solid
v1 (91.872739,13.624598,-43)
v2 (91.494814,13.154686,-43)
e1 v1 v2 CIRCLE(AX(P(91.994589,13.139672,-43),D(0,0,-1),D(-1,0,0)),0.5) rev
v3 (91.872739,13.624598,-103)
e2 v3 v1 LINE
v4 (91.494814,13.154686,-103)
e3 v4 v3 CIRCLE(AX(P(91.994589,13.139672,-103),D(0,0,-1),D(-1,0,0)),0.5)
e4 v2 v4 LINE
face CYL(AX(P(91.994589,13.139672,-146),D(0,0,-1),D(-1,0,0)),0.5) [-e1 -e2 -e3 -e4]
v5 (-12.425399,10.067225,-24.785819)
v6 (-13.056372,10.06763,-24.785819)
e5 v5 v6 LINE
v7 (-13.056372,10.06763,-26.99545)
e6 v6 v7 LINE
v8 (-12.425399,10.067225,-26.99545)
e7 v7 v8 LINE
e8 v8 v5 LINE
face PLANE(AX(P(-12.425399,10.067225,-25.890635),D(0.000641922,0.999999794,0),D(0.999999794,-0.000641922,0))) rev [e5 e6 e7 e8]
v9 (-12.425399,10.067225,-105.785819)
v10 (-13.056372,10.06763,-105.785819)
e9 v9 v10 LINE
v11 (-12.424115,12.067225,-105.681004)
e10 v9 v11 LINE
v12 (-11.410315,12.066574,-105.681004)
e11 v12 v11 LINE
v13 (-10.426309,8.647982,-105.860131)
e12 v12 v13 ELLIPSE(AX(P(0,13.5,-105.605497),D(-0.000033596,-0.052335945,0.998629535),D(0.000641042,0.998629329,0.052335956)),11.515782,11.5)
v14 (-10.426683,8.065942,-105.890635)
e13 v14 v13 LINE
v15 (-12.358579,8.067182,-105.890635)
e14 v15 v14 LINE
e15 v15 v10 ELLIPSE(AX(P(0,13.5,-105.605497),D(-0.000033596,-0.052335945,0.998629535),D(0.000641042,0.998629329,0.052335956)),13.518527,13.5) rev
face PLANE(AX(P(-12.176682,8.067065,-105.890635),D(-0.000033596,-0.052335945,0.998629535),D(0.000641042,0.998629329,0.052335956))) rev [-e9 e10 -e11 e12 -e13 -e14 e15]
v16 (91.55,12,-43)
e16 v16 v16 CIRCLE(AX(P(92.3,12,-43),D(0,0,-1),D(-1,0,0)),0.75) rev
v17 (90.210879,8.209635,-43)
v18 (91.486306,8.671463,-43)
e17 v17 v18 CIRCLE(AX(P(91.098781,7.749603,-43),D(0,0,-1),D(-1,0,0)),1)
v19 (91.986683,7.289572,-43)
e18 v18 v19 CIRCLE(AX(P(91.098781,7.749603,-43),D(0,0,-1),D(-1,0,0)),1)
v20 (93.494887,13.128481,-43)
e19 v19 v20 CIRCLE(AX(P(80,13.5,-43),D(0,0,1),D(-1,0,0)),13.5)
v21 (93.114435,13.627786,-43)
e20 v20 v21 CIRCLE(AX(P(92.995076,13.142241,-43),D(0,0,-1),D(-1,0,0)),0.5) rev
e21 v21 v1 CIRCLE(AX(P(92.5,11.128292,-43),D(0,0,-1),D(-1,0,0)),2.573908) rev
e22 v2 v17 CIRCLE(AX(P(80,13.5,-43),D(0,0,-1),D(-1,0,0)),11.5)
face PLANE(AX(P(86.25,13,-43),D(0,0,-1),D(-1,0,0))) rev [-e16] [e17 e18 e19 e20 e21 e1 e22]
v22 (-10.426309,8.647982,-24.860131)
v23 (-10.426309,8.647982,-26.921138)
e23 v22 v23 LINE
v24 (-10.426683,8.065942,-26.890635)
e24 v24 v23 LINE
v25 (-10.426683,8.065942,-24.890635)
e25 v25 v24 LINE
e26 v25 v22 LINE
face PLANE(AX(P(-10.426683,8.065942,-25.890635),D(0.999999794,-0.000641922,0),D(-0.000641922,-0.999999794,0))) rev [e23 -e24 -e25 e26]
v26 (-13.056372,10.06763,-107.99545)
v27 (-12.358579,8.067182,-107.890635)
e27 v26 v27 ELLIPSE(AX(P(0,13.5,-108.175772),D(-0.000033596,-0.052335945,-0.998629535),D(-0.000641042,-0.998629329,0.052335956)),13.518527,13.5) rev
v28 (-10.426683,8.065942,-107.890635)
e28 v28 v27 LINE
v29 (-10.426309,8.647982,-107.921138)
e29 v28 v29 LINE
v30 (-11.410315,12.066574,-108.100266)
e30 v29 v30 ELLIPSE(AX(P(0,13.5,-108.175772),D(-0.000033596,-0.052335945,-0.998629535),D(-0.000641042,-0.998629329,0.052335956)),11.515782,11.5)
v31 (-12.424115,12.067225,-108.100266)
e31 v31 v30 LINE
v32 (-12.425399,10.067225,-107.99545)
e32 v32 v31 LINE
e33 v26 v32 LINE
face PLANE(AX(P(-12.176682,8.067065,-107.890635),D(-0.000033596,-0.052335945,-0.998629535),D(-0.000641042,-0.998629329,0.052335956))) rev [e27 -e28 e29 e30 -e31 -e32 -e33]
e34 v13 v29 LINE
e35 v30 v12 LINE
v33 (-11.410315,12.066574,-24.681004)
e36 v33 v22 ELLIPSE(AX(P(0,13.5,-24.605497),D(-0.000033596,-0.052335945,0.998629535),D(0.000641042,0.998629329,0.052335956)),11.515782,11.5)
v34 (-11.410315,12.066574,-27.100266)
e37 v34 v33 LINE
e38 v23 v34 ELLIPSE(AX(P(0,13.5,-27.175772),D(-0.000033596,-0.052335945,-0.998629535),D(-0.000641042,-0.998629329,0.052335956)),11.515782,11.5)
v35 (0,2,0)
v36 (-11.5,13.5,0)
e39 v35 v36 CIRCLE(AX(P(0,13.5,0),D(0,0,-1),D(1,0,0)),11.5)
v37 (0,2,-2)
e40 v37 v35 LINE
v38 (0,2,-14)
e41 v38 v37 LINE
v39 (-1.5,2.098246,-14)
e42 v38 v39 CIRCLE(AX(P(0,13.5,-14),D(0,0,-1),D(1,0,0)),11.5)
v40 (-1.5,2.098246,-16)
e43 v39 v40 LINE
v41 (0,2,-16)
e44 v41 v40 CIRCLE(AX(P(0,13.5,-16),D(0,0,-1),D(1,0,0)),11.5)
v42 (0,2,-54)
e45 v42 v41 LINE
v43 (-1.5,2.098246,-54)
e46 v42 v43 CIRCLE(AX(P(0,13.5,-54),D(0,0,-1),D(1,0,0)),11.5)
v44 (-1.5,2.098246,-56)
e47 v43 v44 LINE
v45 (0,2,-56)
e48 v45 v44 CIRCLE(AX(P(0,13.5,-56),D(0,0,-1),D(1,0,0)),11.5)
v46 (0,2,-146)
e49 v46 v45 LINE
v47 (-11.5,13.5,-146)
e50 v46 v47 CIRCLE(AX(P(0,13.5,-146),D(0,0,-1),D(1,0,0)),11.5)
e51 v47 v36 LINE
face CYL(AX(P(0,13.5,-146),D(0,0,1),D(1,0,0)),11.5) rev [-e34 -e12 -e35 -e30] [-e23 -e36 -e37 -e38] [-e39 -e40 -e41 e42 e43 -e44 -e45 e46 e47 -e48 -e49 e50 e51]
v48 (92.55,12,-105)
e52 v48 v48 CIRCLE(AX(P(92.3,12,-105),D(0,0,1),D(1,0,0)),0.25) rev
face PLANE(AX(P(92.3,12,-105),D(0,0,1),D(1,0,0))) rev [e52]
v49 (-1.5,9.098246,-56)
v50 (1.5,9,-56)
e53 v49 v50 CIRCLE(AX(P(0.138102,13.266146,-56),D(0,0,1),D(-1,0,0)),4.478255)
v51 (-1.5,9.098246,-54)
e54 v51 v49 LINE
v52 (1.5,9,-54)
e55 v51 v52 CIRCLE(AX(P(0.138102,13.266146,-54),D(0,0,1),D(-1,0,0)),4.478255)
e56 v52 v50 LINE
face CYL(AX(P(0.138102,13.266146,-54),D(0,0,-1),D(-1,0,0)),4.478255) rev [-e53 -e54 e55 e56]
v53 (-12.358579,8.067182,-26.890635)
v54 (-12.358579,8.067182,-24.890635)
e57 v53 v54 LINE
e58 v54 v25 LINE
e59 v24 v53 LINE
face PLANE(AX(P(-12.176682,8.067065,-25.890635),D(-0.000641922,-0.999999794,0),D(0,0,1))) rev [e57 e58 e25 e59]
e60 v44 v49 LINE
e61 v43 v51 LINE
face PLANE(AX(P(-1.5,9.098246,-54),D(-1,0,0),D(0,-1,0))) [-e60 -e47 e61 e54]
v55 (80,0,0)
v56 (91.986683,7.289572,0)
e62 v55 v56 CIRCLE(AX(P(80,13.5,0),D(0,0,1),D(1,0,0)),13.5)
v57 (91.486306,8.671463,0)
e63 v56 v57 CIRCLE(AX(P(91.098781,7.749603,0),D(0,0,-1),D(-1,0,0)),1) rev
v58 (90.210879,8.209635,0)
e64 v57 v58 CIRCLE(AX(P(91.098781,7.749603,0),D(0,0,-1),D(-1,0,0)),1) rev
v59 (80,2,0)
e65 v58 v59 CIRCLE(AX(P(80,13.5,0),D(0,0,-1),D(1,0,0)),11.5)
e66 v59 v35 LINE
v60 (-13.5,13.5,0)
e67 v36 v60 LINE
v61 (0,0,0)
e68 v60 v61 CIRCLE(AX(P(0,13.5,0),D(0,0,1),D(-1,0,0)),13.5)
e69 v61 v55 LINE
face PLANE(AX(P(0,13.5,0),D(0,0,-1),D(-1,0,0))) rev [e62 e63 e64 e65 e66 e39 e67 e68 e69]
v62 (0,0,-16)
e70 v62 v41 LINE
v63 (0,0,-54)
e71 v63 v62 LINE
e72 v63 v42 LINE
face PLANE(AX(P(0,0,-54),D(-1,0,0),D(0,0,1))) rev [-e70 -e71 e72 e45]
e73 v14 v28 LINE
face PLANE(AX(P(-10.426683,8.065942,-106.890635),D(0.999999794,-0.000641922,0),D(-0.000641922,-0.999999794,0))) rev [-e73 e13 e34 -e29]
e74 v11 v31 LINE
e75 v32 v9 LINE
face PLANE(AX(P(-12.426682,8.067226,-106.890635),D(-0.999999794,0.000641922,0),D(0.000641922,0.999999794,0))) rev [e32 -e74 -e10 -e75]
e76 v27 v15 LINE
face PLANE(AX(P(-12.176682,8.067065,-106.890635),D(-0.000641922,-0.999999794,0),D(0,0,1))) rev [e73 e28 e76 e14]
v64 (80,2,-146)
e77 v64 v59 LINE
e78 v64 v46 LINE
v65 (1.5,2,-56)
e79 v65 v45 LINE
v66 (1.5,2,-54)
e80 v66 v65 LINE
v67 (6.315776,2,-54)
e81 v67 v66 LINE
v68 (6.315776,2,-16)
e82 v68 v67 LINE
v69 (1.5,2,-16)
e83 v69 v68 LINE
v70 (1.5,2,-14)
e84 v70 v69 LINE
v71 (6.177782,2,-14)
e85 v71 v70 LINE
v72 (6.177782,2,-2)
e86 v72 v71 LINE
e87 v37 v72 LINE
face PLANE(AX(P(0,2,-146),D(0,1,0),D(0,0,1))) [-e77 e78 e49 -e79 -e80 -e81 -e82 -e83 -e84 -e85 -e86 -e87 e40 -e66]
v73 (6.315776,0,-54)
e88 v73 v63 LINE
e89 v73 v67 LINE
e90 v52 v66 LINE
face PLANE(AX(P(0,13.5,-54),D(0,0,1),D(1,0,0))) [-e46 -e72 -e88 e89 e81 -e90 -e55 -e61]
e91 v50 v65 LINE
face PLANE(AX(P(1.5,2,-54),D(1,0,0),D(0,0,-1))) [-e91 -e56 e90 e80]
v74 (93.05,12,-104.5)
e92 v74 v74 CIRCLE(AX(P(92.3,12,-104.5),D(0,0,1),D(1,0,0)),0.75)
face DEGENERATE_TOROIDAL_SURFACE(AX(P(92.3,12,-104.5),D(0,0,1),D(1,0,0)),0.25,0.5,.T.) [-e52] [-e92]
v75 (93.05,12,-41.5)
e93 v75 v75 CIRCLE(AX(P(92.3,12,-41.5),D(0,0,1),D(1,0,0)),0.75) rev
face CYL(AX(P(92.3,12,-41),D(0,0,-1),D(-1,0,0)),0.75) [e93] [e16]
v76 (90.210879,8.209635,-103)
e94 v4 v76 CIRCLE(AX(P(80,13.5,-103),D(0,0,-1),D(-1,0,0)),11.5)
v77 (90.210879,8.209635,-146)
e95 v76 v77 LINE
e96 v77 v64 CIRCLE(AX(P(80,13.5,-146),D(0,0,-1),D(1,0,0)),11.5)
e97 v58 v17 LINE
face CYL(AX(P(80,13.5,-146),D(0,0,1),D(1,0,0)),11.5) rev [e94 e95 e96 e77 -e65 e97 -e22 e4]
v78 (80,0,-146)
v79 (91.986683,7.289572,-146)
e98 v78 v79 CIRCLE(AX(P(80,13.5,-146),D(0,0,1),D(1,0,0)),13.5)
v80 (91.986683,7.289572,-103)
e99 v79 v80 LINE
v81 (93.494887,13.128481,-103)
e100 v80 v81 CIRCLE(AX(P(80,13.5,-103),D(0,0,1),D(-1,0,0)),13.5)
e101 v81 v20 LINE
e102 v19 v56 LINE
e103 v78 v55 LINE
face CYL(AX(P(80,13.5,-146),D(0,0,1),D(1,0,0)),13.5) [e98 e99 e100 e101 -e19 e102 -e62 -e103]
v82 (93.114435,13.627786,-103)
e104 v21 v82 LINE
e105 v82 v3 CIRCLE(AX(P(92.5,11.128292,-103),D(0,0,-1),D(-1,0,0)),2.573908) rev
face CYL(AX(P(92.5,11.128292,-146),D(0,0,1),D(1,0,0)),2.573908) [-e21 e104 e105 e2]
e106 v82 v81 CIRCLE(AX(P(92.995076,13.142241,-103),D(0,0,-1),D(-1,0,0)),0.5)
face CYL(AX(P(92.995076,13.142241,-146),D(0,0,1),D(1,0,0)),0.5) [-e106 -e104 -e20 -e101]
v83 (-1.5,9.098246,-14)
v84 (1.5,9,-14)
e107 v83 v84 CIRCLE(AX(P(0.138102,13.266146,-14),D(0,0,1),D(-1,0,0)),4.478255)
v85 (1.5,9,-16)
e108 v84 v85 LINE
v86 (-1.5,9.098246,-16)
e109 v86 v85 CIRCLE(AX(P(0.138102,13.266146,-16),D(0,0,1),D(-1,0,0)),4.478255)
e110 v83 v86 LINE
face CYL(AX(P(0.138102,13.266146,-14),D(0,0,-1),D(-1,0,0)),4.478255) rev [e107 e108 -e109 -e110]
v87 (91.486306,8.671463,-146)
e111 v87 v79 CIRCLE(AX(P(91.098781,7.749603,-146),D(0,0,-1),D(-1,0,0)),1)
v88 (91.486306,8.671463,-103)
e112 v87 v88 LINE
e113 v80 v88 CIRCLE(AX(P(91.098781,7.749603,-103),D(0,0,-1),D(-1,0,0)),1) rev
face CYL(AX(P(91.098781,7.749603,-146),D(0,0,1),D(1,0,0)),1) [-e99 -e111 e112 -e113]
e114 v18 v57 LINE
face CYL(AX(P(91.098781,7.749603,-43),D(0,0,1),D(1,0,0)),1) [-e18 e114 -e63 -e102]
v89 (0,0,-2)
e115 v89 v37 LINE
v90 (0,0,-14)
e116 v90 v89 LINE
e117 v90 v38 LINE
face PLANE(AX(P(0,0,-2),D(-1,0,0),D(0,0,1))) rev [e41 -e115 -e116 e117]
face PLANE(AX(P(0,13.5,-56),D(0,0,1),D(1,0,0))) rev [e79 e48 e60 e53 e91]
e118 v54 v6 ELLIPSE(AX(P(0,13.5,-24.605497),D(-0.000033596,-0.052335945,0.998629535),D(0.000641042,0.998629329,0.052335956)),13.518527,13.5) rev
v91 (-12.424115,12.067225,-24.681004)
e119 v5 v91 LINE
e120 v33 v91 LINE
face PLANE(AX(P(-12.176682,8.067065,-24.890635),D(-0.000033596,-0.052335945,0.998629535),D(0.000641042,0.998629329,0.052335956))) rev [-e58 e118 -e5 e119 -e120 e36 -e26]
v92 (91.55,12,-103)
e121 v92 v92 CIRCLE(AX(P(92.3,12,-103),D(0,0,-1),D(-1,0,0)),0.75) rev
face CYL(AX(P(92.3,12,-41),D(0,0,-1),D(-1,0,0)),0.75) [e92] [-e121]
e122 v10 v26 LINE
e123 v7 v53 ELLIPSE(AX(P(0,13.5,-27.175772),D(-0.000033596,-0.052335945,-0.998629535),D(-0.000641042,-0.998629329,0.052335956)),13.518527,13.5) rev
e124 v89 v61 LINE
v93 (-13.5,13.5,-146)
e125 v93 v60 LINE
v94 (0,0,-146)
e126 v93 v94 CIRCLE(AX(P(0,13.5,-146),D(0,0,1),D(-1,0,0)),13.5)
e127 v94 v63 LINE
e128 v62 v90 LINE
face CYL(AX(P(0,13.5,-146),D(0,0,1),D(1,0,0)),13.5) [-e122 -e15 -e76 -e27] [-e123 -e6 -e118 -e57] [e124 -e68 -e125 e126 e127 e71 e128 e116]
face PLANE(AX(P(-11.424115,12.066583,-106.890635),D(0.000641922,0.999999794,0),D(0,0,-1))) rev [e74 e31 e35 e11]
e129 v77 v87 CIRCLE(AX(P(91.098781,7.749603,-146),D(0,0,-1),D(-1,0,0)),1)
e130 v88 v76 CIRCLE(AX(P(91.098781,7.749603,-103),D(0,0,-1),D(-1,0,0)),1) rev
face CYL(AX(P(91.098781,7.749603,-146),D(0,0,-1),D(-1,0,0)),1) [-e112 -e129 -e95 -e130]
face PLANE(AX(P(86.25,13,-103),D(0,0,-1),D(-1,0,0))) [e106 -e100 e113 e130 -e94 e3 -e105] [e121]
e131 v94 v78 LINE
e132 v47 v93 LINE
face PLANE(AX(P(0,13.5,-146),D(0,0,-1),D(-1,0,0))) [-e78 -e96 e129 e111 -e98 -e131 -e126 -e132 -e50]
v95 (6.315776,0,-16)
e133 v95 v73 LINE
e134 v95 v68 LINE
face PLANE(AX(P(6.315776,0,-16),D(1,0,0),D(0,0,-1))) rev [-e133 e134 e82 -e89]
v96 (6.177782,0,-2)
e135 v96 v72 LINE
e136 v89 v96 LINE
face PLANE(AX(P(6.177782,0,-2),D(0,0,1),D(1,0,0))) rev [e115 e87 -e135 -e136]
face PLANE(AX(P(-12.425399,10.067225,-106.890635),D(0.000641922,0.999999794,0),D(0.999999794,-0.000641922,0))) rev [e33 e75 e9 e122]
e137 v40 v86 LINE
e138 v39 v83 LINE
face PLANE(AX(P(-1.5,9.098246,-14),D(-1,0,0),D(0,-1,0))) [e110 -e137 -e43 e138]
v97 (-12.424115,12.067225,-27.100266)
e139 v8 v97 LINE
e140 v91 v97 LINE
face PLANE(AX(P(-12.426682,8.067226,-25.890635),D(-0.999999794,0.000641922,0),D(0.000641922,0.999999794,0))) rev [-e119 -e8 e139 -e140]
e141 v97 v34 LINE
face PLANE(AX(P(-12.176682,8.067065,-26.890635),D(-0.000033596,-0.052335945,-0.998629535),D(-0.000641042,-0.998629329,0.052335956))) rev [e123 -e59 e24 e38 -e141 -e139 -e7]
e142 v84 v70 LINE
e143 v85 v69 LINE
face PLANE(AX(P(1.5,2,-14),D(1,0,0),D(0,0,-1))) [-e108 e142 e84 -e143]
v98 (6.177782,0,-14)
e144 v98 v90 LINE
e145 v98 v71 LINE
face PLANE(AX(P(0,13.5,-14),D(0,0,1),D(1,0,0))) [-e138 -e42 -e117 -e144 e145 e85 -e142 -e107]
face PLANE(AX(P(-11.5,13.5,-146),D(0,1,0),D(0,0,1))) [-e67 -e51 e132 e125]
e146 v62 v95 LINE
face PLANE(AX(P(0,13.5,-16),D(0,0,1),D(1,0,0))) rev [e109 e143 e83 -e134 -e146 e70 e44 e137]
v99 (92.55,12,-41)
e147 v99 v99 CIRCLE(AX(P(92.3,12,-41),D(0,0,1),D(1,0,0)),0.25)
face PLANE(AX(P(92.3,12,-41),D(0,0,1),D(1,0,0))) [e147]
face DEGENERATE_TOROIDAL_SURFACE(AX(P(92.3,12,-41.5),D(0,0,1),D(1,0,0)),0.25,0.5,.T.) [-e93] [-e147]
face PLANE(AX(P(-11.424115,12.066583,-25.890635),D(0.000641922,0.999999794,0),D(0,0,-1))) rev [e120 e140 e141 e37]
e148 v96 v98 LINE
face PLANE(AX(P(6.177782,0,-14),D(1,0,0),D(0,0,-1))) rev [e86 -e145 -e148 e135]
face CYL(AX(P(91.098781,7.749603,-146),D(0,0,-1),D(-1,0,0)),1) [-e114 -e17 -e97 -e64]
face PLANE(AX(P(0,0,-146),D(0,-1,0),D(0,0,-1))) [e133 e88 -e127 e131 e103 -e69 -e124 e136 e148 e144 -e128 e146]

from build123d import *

# Parameters (mm, degrees)
BASE_DEPTH             = 146
HINGE_CUT_DEPTH        = 43
HINGE_START            = -103
HINGE_CUT_2_DEPTH      = 43
HINGE_START_2          = -62
SKETCH3_R              = 0.75
HINGE_EXTRUSIONS_DEPTH = 64
FILLET5_R              = 0.5
FILLET6_R              = 0.5
SYRINGE_START          = -92
SYRINGE_HOLDER_DEPTH   = 2
LPATTERN4_COUNT        = 2
LPATTERN4_PITCH        = 40
FILLET7_R              = 1
FILLET8_R              = 0.5
SNAP_START             = -12.431858348
SNAP_GROOVE1_DEPTH     = 2
SNAP_START_2           = -13.062831461
SNAP_GROOVE1_2_DEPTH   = 0.630973113
LPATTERN5_COUNT        = 2
LPATTERN5_PITCH        = 81
SKETCH6_W              = 6.31577628
SKETCH6_H              = 38
VISIBILITY_DEPTH       = 2
SKETCH7_W              = 6.177782062
SKETCH7_H              = 12
CUT_EXTRUDE4_DEPTH     = 2


# Read off the part's stored shape, not the designer's step: Snap Groove1
with BuildPart() as part:
    # Sketch1 → Base (new body)
    with BuildSketch(Plane.XY):
        with BuildLine():
            Line((0, 0), (80, 0))
            ThreePointArc((80, 0), (89.545941546, 3.954058454), (93.5, 13.5))
            ThreePointArc((93.5, 13.5), (92.5, 13.70219929), (91.5, 13.5))
            ThreePointArc((91.5, 13.5), (88.131727984, 5.368272016), (80, 2))
            Line((80, 2), (0, 2))
            ThreePointArc((0, 2), (-8.131727984, 5.368272016), (-11.5, 13.5))
            Line((-11.5, 13.5), (-13.5, 13.5))
            ThreePointArc((-13.5, 13.5), (-9.545941546, 3.954058454), (0, 0))
        make_face()
    extrude(amount=-BASE_DEPTH)

    # Sketch2 → Hinge cut (cut)
    with BuildSketch(Plane.XY):
        with BuildLine():
            ThreePointArc((93.5, 13.5), (93.179996096, 10.578065212), (92.235155125, 7.794653467))
            ThreePointArc((92.235155125, 7.794653467), (91.53133512, 8.651508178), (90.422539551, 8.63988999))
            ThreePointArc((90.422539551, 8.63988999), (91.227404082, 11.01094444), (91.5, 13.5))
            ThreePointArc((91.5, 13.5), (92.5, 13.914213562), (93.5, 13.5))
        make_face()
    extrude(amount=-HINGE_CUT_DEPTH, mode=Mode.SUBTRACT)

    # Sketch2<2> → Hinge cut 2 (cut)
    with BuildSketch(Plane.XY.offset(HINGE_START)):
        with BuildLine():
            ThreePointArc((93.5, 13.5), (93.179996096, 10.578065212), (92.235155125, 7.794653467))
            ThreePointArc((92.235155125, 7.794653467), (91.53133512, 8.651508178), (90.422539551, 8.63988999))
            ThreePointArc((90.422539551, 8.63988999), (91.227404082, 11.01094444), (91.5, 13.5))
            ThreePointArc((91.5, 13.5), (92.5, 13.914213562), (93.5, 13.5))
        make_face()
    extrude(amount=-HINGE_CUT_2_DEPTH, mode=Mode.SUBTRACT)

    # Sketch3 → hinge extrusions (add)
    with BuildSketch(Plane.XY.offset(-43).offset(HINGE_START_2)):
        with Locations(Location((92.3, 12, 0), (0, 0, 180))):
            Circle(SKETCH3_R)
    extrude(amount=HINGE_EXTRUSIONS_DEPTH)

    # Fillet5
    fillet5_edges = [part.edges().sort_by_distance(p)[0] for p in [
        (93.05, 12, -105),
    ]]
    fillet(fillet5_edges, radius=FILLET5_R)

    # Fillet6
    fillet6_edges = [part.edges().sort_by_distance(p)[0] for p in [
        (93.05, 12, -41),
    ]]
    fillet(fillet6_edges, radius=FILLET6_R)

    # Sketch5 → Syringe holder (add)
    with BuildSketch(Plane(origin=(0, 0, -146), x_dir=(-1, 0, 0), z_dir=(0, 0, -1)).offset(SYRINGE_START)):
        with BuildLine():
            Line((0, 2), (-1.5, 2))
            Line((-1.5, 2), (-1.5, 9))
            ThreePointArc((-1.5, 9), (0.0084764, 8.790290315), (1.5, 9.098245749))
            Line((1.5, 9.098245749), (1.5, 2.098245749))
            ThreePointArc((1.5, 2.098245749), (0.751606983, 2.024587722), (0, 2))
        make_face()
    syringe_holder = extrude(amount=SYRINGE_HOLDER_DEPTH)

    # LPattern4: Syringe holder ×2
    with Locations(*[(0, 0, i * LPATTERN4_PITCH) for i in range(1, LPATTERN4_COUNT)]):
        add(syringe_holder)

    # Fillet7
    fillet7_edges = [part.edges().sort_by_distance(p)[0] for p in [
        (92.235155125, 7.794653467, -21.5),
        (90.422539551, 8.63988999, -21.5),
        (92.235155125, 7.794653467, -124.5),
        (90.422539551, 8.63988999, -124.5),
    ]]
    fillet(fillet7_edges, radius=FILLET7_R - 0.0001)  # a hair under: the kernel refuses the full size

    # Fillet8
    fillet8_edges = [part.edges().sort_by_distance(p)[0] for p in [
        (93.5, 13.5, -73),
        (91.5, 13.5, -73),
    ]]
    fillet(fillet8_edges, radius=FILLET8_R)

    # Snap Groove1 outline → Snap Groove1 (cut)
    with BuildSketch(Plane(origin=(0, 0, 0), x_dir=(0.0006419218138647702, 0.9999997939681713, 0), z_dir=(0.9999997939681713, -0.0006419218138647702, 0)).offset(SNAP_START)):
        Polygon((8.059246911, -107.890634842), (12.059246911, -108.100265959), (12.059246911, -105.681003725), (8.059246911, -105.890634842), align=None)
    snap_groove1 = extrude(amount=SNAP_GROOVE1_DEPTH, mode=Mode.SUBTRACT)

    # Snap Groove1 2 outline → Snap Groove1 2 (cut)
    with BuildSketch(Plane(origin=(0, 0, 0), x_dir=(0.0006419218138647702, 0.9999997939681713, 0), z_dir=(0.9999997939681713, -0.0006419218138647702, 0)).offset(SNAP_START_2)):
        Polygon((8.059246911, -107.890634842), (10.059246911, -107.9954504), (10.059246911, -105.785819283), (8.059246911, -105.890634842), align=None)
    snap_groove1_2 = extrude(amount=SNAP_GROOVE1_2_DEPTH, mode=Mode.SUBTRACT)

    # LPattern5: Snap Groove1, Snap Groove1 2 ×2
    with Locations(*[(0, 0, i * LPATTERN5_PITCH) for i in range(1, LPATTERN5_COUNT)]):
        add(snap_groove1, mode=Mode.SUBTRACT)
        add(snap_groove1_2, mode=Mode.SUBTRACT)

    # Sketch6 → Visibility (cut)
    with BuildSketch(Plane(origin=(0, 2, 0), x_dir=(1, 0, 0), z_dir=(0, 1, 0))):
        with Locations((3.15788814, 35)):
            Rectangle(SKETCH6_W, SKETCH6_H)
    extrude(amount=-VISIBILITY_DEPTH, mode=Mode.SUBTRACT)

    # Sketch7 → Cut-Extrude4 (cut)
    with BuildSketch(Plane(origin=(0, 2, 0), x_dir=(1, 0, 0), z_dir=(0, 1, 0))):
        with Locations((3.088891031, 8)):
            Rectangle(SKETCH7_W, SKETCH7_H)
    extrude(amount=-CUT_EXTRUDE4_DEPTH, mode=Mode.SUBTRACT)


solid = part.part
